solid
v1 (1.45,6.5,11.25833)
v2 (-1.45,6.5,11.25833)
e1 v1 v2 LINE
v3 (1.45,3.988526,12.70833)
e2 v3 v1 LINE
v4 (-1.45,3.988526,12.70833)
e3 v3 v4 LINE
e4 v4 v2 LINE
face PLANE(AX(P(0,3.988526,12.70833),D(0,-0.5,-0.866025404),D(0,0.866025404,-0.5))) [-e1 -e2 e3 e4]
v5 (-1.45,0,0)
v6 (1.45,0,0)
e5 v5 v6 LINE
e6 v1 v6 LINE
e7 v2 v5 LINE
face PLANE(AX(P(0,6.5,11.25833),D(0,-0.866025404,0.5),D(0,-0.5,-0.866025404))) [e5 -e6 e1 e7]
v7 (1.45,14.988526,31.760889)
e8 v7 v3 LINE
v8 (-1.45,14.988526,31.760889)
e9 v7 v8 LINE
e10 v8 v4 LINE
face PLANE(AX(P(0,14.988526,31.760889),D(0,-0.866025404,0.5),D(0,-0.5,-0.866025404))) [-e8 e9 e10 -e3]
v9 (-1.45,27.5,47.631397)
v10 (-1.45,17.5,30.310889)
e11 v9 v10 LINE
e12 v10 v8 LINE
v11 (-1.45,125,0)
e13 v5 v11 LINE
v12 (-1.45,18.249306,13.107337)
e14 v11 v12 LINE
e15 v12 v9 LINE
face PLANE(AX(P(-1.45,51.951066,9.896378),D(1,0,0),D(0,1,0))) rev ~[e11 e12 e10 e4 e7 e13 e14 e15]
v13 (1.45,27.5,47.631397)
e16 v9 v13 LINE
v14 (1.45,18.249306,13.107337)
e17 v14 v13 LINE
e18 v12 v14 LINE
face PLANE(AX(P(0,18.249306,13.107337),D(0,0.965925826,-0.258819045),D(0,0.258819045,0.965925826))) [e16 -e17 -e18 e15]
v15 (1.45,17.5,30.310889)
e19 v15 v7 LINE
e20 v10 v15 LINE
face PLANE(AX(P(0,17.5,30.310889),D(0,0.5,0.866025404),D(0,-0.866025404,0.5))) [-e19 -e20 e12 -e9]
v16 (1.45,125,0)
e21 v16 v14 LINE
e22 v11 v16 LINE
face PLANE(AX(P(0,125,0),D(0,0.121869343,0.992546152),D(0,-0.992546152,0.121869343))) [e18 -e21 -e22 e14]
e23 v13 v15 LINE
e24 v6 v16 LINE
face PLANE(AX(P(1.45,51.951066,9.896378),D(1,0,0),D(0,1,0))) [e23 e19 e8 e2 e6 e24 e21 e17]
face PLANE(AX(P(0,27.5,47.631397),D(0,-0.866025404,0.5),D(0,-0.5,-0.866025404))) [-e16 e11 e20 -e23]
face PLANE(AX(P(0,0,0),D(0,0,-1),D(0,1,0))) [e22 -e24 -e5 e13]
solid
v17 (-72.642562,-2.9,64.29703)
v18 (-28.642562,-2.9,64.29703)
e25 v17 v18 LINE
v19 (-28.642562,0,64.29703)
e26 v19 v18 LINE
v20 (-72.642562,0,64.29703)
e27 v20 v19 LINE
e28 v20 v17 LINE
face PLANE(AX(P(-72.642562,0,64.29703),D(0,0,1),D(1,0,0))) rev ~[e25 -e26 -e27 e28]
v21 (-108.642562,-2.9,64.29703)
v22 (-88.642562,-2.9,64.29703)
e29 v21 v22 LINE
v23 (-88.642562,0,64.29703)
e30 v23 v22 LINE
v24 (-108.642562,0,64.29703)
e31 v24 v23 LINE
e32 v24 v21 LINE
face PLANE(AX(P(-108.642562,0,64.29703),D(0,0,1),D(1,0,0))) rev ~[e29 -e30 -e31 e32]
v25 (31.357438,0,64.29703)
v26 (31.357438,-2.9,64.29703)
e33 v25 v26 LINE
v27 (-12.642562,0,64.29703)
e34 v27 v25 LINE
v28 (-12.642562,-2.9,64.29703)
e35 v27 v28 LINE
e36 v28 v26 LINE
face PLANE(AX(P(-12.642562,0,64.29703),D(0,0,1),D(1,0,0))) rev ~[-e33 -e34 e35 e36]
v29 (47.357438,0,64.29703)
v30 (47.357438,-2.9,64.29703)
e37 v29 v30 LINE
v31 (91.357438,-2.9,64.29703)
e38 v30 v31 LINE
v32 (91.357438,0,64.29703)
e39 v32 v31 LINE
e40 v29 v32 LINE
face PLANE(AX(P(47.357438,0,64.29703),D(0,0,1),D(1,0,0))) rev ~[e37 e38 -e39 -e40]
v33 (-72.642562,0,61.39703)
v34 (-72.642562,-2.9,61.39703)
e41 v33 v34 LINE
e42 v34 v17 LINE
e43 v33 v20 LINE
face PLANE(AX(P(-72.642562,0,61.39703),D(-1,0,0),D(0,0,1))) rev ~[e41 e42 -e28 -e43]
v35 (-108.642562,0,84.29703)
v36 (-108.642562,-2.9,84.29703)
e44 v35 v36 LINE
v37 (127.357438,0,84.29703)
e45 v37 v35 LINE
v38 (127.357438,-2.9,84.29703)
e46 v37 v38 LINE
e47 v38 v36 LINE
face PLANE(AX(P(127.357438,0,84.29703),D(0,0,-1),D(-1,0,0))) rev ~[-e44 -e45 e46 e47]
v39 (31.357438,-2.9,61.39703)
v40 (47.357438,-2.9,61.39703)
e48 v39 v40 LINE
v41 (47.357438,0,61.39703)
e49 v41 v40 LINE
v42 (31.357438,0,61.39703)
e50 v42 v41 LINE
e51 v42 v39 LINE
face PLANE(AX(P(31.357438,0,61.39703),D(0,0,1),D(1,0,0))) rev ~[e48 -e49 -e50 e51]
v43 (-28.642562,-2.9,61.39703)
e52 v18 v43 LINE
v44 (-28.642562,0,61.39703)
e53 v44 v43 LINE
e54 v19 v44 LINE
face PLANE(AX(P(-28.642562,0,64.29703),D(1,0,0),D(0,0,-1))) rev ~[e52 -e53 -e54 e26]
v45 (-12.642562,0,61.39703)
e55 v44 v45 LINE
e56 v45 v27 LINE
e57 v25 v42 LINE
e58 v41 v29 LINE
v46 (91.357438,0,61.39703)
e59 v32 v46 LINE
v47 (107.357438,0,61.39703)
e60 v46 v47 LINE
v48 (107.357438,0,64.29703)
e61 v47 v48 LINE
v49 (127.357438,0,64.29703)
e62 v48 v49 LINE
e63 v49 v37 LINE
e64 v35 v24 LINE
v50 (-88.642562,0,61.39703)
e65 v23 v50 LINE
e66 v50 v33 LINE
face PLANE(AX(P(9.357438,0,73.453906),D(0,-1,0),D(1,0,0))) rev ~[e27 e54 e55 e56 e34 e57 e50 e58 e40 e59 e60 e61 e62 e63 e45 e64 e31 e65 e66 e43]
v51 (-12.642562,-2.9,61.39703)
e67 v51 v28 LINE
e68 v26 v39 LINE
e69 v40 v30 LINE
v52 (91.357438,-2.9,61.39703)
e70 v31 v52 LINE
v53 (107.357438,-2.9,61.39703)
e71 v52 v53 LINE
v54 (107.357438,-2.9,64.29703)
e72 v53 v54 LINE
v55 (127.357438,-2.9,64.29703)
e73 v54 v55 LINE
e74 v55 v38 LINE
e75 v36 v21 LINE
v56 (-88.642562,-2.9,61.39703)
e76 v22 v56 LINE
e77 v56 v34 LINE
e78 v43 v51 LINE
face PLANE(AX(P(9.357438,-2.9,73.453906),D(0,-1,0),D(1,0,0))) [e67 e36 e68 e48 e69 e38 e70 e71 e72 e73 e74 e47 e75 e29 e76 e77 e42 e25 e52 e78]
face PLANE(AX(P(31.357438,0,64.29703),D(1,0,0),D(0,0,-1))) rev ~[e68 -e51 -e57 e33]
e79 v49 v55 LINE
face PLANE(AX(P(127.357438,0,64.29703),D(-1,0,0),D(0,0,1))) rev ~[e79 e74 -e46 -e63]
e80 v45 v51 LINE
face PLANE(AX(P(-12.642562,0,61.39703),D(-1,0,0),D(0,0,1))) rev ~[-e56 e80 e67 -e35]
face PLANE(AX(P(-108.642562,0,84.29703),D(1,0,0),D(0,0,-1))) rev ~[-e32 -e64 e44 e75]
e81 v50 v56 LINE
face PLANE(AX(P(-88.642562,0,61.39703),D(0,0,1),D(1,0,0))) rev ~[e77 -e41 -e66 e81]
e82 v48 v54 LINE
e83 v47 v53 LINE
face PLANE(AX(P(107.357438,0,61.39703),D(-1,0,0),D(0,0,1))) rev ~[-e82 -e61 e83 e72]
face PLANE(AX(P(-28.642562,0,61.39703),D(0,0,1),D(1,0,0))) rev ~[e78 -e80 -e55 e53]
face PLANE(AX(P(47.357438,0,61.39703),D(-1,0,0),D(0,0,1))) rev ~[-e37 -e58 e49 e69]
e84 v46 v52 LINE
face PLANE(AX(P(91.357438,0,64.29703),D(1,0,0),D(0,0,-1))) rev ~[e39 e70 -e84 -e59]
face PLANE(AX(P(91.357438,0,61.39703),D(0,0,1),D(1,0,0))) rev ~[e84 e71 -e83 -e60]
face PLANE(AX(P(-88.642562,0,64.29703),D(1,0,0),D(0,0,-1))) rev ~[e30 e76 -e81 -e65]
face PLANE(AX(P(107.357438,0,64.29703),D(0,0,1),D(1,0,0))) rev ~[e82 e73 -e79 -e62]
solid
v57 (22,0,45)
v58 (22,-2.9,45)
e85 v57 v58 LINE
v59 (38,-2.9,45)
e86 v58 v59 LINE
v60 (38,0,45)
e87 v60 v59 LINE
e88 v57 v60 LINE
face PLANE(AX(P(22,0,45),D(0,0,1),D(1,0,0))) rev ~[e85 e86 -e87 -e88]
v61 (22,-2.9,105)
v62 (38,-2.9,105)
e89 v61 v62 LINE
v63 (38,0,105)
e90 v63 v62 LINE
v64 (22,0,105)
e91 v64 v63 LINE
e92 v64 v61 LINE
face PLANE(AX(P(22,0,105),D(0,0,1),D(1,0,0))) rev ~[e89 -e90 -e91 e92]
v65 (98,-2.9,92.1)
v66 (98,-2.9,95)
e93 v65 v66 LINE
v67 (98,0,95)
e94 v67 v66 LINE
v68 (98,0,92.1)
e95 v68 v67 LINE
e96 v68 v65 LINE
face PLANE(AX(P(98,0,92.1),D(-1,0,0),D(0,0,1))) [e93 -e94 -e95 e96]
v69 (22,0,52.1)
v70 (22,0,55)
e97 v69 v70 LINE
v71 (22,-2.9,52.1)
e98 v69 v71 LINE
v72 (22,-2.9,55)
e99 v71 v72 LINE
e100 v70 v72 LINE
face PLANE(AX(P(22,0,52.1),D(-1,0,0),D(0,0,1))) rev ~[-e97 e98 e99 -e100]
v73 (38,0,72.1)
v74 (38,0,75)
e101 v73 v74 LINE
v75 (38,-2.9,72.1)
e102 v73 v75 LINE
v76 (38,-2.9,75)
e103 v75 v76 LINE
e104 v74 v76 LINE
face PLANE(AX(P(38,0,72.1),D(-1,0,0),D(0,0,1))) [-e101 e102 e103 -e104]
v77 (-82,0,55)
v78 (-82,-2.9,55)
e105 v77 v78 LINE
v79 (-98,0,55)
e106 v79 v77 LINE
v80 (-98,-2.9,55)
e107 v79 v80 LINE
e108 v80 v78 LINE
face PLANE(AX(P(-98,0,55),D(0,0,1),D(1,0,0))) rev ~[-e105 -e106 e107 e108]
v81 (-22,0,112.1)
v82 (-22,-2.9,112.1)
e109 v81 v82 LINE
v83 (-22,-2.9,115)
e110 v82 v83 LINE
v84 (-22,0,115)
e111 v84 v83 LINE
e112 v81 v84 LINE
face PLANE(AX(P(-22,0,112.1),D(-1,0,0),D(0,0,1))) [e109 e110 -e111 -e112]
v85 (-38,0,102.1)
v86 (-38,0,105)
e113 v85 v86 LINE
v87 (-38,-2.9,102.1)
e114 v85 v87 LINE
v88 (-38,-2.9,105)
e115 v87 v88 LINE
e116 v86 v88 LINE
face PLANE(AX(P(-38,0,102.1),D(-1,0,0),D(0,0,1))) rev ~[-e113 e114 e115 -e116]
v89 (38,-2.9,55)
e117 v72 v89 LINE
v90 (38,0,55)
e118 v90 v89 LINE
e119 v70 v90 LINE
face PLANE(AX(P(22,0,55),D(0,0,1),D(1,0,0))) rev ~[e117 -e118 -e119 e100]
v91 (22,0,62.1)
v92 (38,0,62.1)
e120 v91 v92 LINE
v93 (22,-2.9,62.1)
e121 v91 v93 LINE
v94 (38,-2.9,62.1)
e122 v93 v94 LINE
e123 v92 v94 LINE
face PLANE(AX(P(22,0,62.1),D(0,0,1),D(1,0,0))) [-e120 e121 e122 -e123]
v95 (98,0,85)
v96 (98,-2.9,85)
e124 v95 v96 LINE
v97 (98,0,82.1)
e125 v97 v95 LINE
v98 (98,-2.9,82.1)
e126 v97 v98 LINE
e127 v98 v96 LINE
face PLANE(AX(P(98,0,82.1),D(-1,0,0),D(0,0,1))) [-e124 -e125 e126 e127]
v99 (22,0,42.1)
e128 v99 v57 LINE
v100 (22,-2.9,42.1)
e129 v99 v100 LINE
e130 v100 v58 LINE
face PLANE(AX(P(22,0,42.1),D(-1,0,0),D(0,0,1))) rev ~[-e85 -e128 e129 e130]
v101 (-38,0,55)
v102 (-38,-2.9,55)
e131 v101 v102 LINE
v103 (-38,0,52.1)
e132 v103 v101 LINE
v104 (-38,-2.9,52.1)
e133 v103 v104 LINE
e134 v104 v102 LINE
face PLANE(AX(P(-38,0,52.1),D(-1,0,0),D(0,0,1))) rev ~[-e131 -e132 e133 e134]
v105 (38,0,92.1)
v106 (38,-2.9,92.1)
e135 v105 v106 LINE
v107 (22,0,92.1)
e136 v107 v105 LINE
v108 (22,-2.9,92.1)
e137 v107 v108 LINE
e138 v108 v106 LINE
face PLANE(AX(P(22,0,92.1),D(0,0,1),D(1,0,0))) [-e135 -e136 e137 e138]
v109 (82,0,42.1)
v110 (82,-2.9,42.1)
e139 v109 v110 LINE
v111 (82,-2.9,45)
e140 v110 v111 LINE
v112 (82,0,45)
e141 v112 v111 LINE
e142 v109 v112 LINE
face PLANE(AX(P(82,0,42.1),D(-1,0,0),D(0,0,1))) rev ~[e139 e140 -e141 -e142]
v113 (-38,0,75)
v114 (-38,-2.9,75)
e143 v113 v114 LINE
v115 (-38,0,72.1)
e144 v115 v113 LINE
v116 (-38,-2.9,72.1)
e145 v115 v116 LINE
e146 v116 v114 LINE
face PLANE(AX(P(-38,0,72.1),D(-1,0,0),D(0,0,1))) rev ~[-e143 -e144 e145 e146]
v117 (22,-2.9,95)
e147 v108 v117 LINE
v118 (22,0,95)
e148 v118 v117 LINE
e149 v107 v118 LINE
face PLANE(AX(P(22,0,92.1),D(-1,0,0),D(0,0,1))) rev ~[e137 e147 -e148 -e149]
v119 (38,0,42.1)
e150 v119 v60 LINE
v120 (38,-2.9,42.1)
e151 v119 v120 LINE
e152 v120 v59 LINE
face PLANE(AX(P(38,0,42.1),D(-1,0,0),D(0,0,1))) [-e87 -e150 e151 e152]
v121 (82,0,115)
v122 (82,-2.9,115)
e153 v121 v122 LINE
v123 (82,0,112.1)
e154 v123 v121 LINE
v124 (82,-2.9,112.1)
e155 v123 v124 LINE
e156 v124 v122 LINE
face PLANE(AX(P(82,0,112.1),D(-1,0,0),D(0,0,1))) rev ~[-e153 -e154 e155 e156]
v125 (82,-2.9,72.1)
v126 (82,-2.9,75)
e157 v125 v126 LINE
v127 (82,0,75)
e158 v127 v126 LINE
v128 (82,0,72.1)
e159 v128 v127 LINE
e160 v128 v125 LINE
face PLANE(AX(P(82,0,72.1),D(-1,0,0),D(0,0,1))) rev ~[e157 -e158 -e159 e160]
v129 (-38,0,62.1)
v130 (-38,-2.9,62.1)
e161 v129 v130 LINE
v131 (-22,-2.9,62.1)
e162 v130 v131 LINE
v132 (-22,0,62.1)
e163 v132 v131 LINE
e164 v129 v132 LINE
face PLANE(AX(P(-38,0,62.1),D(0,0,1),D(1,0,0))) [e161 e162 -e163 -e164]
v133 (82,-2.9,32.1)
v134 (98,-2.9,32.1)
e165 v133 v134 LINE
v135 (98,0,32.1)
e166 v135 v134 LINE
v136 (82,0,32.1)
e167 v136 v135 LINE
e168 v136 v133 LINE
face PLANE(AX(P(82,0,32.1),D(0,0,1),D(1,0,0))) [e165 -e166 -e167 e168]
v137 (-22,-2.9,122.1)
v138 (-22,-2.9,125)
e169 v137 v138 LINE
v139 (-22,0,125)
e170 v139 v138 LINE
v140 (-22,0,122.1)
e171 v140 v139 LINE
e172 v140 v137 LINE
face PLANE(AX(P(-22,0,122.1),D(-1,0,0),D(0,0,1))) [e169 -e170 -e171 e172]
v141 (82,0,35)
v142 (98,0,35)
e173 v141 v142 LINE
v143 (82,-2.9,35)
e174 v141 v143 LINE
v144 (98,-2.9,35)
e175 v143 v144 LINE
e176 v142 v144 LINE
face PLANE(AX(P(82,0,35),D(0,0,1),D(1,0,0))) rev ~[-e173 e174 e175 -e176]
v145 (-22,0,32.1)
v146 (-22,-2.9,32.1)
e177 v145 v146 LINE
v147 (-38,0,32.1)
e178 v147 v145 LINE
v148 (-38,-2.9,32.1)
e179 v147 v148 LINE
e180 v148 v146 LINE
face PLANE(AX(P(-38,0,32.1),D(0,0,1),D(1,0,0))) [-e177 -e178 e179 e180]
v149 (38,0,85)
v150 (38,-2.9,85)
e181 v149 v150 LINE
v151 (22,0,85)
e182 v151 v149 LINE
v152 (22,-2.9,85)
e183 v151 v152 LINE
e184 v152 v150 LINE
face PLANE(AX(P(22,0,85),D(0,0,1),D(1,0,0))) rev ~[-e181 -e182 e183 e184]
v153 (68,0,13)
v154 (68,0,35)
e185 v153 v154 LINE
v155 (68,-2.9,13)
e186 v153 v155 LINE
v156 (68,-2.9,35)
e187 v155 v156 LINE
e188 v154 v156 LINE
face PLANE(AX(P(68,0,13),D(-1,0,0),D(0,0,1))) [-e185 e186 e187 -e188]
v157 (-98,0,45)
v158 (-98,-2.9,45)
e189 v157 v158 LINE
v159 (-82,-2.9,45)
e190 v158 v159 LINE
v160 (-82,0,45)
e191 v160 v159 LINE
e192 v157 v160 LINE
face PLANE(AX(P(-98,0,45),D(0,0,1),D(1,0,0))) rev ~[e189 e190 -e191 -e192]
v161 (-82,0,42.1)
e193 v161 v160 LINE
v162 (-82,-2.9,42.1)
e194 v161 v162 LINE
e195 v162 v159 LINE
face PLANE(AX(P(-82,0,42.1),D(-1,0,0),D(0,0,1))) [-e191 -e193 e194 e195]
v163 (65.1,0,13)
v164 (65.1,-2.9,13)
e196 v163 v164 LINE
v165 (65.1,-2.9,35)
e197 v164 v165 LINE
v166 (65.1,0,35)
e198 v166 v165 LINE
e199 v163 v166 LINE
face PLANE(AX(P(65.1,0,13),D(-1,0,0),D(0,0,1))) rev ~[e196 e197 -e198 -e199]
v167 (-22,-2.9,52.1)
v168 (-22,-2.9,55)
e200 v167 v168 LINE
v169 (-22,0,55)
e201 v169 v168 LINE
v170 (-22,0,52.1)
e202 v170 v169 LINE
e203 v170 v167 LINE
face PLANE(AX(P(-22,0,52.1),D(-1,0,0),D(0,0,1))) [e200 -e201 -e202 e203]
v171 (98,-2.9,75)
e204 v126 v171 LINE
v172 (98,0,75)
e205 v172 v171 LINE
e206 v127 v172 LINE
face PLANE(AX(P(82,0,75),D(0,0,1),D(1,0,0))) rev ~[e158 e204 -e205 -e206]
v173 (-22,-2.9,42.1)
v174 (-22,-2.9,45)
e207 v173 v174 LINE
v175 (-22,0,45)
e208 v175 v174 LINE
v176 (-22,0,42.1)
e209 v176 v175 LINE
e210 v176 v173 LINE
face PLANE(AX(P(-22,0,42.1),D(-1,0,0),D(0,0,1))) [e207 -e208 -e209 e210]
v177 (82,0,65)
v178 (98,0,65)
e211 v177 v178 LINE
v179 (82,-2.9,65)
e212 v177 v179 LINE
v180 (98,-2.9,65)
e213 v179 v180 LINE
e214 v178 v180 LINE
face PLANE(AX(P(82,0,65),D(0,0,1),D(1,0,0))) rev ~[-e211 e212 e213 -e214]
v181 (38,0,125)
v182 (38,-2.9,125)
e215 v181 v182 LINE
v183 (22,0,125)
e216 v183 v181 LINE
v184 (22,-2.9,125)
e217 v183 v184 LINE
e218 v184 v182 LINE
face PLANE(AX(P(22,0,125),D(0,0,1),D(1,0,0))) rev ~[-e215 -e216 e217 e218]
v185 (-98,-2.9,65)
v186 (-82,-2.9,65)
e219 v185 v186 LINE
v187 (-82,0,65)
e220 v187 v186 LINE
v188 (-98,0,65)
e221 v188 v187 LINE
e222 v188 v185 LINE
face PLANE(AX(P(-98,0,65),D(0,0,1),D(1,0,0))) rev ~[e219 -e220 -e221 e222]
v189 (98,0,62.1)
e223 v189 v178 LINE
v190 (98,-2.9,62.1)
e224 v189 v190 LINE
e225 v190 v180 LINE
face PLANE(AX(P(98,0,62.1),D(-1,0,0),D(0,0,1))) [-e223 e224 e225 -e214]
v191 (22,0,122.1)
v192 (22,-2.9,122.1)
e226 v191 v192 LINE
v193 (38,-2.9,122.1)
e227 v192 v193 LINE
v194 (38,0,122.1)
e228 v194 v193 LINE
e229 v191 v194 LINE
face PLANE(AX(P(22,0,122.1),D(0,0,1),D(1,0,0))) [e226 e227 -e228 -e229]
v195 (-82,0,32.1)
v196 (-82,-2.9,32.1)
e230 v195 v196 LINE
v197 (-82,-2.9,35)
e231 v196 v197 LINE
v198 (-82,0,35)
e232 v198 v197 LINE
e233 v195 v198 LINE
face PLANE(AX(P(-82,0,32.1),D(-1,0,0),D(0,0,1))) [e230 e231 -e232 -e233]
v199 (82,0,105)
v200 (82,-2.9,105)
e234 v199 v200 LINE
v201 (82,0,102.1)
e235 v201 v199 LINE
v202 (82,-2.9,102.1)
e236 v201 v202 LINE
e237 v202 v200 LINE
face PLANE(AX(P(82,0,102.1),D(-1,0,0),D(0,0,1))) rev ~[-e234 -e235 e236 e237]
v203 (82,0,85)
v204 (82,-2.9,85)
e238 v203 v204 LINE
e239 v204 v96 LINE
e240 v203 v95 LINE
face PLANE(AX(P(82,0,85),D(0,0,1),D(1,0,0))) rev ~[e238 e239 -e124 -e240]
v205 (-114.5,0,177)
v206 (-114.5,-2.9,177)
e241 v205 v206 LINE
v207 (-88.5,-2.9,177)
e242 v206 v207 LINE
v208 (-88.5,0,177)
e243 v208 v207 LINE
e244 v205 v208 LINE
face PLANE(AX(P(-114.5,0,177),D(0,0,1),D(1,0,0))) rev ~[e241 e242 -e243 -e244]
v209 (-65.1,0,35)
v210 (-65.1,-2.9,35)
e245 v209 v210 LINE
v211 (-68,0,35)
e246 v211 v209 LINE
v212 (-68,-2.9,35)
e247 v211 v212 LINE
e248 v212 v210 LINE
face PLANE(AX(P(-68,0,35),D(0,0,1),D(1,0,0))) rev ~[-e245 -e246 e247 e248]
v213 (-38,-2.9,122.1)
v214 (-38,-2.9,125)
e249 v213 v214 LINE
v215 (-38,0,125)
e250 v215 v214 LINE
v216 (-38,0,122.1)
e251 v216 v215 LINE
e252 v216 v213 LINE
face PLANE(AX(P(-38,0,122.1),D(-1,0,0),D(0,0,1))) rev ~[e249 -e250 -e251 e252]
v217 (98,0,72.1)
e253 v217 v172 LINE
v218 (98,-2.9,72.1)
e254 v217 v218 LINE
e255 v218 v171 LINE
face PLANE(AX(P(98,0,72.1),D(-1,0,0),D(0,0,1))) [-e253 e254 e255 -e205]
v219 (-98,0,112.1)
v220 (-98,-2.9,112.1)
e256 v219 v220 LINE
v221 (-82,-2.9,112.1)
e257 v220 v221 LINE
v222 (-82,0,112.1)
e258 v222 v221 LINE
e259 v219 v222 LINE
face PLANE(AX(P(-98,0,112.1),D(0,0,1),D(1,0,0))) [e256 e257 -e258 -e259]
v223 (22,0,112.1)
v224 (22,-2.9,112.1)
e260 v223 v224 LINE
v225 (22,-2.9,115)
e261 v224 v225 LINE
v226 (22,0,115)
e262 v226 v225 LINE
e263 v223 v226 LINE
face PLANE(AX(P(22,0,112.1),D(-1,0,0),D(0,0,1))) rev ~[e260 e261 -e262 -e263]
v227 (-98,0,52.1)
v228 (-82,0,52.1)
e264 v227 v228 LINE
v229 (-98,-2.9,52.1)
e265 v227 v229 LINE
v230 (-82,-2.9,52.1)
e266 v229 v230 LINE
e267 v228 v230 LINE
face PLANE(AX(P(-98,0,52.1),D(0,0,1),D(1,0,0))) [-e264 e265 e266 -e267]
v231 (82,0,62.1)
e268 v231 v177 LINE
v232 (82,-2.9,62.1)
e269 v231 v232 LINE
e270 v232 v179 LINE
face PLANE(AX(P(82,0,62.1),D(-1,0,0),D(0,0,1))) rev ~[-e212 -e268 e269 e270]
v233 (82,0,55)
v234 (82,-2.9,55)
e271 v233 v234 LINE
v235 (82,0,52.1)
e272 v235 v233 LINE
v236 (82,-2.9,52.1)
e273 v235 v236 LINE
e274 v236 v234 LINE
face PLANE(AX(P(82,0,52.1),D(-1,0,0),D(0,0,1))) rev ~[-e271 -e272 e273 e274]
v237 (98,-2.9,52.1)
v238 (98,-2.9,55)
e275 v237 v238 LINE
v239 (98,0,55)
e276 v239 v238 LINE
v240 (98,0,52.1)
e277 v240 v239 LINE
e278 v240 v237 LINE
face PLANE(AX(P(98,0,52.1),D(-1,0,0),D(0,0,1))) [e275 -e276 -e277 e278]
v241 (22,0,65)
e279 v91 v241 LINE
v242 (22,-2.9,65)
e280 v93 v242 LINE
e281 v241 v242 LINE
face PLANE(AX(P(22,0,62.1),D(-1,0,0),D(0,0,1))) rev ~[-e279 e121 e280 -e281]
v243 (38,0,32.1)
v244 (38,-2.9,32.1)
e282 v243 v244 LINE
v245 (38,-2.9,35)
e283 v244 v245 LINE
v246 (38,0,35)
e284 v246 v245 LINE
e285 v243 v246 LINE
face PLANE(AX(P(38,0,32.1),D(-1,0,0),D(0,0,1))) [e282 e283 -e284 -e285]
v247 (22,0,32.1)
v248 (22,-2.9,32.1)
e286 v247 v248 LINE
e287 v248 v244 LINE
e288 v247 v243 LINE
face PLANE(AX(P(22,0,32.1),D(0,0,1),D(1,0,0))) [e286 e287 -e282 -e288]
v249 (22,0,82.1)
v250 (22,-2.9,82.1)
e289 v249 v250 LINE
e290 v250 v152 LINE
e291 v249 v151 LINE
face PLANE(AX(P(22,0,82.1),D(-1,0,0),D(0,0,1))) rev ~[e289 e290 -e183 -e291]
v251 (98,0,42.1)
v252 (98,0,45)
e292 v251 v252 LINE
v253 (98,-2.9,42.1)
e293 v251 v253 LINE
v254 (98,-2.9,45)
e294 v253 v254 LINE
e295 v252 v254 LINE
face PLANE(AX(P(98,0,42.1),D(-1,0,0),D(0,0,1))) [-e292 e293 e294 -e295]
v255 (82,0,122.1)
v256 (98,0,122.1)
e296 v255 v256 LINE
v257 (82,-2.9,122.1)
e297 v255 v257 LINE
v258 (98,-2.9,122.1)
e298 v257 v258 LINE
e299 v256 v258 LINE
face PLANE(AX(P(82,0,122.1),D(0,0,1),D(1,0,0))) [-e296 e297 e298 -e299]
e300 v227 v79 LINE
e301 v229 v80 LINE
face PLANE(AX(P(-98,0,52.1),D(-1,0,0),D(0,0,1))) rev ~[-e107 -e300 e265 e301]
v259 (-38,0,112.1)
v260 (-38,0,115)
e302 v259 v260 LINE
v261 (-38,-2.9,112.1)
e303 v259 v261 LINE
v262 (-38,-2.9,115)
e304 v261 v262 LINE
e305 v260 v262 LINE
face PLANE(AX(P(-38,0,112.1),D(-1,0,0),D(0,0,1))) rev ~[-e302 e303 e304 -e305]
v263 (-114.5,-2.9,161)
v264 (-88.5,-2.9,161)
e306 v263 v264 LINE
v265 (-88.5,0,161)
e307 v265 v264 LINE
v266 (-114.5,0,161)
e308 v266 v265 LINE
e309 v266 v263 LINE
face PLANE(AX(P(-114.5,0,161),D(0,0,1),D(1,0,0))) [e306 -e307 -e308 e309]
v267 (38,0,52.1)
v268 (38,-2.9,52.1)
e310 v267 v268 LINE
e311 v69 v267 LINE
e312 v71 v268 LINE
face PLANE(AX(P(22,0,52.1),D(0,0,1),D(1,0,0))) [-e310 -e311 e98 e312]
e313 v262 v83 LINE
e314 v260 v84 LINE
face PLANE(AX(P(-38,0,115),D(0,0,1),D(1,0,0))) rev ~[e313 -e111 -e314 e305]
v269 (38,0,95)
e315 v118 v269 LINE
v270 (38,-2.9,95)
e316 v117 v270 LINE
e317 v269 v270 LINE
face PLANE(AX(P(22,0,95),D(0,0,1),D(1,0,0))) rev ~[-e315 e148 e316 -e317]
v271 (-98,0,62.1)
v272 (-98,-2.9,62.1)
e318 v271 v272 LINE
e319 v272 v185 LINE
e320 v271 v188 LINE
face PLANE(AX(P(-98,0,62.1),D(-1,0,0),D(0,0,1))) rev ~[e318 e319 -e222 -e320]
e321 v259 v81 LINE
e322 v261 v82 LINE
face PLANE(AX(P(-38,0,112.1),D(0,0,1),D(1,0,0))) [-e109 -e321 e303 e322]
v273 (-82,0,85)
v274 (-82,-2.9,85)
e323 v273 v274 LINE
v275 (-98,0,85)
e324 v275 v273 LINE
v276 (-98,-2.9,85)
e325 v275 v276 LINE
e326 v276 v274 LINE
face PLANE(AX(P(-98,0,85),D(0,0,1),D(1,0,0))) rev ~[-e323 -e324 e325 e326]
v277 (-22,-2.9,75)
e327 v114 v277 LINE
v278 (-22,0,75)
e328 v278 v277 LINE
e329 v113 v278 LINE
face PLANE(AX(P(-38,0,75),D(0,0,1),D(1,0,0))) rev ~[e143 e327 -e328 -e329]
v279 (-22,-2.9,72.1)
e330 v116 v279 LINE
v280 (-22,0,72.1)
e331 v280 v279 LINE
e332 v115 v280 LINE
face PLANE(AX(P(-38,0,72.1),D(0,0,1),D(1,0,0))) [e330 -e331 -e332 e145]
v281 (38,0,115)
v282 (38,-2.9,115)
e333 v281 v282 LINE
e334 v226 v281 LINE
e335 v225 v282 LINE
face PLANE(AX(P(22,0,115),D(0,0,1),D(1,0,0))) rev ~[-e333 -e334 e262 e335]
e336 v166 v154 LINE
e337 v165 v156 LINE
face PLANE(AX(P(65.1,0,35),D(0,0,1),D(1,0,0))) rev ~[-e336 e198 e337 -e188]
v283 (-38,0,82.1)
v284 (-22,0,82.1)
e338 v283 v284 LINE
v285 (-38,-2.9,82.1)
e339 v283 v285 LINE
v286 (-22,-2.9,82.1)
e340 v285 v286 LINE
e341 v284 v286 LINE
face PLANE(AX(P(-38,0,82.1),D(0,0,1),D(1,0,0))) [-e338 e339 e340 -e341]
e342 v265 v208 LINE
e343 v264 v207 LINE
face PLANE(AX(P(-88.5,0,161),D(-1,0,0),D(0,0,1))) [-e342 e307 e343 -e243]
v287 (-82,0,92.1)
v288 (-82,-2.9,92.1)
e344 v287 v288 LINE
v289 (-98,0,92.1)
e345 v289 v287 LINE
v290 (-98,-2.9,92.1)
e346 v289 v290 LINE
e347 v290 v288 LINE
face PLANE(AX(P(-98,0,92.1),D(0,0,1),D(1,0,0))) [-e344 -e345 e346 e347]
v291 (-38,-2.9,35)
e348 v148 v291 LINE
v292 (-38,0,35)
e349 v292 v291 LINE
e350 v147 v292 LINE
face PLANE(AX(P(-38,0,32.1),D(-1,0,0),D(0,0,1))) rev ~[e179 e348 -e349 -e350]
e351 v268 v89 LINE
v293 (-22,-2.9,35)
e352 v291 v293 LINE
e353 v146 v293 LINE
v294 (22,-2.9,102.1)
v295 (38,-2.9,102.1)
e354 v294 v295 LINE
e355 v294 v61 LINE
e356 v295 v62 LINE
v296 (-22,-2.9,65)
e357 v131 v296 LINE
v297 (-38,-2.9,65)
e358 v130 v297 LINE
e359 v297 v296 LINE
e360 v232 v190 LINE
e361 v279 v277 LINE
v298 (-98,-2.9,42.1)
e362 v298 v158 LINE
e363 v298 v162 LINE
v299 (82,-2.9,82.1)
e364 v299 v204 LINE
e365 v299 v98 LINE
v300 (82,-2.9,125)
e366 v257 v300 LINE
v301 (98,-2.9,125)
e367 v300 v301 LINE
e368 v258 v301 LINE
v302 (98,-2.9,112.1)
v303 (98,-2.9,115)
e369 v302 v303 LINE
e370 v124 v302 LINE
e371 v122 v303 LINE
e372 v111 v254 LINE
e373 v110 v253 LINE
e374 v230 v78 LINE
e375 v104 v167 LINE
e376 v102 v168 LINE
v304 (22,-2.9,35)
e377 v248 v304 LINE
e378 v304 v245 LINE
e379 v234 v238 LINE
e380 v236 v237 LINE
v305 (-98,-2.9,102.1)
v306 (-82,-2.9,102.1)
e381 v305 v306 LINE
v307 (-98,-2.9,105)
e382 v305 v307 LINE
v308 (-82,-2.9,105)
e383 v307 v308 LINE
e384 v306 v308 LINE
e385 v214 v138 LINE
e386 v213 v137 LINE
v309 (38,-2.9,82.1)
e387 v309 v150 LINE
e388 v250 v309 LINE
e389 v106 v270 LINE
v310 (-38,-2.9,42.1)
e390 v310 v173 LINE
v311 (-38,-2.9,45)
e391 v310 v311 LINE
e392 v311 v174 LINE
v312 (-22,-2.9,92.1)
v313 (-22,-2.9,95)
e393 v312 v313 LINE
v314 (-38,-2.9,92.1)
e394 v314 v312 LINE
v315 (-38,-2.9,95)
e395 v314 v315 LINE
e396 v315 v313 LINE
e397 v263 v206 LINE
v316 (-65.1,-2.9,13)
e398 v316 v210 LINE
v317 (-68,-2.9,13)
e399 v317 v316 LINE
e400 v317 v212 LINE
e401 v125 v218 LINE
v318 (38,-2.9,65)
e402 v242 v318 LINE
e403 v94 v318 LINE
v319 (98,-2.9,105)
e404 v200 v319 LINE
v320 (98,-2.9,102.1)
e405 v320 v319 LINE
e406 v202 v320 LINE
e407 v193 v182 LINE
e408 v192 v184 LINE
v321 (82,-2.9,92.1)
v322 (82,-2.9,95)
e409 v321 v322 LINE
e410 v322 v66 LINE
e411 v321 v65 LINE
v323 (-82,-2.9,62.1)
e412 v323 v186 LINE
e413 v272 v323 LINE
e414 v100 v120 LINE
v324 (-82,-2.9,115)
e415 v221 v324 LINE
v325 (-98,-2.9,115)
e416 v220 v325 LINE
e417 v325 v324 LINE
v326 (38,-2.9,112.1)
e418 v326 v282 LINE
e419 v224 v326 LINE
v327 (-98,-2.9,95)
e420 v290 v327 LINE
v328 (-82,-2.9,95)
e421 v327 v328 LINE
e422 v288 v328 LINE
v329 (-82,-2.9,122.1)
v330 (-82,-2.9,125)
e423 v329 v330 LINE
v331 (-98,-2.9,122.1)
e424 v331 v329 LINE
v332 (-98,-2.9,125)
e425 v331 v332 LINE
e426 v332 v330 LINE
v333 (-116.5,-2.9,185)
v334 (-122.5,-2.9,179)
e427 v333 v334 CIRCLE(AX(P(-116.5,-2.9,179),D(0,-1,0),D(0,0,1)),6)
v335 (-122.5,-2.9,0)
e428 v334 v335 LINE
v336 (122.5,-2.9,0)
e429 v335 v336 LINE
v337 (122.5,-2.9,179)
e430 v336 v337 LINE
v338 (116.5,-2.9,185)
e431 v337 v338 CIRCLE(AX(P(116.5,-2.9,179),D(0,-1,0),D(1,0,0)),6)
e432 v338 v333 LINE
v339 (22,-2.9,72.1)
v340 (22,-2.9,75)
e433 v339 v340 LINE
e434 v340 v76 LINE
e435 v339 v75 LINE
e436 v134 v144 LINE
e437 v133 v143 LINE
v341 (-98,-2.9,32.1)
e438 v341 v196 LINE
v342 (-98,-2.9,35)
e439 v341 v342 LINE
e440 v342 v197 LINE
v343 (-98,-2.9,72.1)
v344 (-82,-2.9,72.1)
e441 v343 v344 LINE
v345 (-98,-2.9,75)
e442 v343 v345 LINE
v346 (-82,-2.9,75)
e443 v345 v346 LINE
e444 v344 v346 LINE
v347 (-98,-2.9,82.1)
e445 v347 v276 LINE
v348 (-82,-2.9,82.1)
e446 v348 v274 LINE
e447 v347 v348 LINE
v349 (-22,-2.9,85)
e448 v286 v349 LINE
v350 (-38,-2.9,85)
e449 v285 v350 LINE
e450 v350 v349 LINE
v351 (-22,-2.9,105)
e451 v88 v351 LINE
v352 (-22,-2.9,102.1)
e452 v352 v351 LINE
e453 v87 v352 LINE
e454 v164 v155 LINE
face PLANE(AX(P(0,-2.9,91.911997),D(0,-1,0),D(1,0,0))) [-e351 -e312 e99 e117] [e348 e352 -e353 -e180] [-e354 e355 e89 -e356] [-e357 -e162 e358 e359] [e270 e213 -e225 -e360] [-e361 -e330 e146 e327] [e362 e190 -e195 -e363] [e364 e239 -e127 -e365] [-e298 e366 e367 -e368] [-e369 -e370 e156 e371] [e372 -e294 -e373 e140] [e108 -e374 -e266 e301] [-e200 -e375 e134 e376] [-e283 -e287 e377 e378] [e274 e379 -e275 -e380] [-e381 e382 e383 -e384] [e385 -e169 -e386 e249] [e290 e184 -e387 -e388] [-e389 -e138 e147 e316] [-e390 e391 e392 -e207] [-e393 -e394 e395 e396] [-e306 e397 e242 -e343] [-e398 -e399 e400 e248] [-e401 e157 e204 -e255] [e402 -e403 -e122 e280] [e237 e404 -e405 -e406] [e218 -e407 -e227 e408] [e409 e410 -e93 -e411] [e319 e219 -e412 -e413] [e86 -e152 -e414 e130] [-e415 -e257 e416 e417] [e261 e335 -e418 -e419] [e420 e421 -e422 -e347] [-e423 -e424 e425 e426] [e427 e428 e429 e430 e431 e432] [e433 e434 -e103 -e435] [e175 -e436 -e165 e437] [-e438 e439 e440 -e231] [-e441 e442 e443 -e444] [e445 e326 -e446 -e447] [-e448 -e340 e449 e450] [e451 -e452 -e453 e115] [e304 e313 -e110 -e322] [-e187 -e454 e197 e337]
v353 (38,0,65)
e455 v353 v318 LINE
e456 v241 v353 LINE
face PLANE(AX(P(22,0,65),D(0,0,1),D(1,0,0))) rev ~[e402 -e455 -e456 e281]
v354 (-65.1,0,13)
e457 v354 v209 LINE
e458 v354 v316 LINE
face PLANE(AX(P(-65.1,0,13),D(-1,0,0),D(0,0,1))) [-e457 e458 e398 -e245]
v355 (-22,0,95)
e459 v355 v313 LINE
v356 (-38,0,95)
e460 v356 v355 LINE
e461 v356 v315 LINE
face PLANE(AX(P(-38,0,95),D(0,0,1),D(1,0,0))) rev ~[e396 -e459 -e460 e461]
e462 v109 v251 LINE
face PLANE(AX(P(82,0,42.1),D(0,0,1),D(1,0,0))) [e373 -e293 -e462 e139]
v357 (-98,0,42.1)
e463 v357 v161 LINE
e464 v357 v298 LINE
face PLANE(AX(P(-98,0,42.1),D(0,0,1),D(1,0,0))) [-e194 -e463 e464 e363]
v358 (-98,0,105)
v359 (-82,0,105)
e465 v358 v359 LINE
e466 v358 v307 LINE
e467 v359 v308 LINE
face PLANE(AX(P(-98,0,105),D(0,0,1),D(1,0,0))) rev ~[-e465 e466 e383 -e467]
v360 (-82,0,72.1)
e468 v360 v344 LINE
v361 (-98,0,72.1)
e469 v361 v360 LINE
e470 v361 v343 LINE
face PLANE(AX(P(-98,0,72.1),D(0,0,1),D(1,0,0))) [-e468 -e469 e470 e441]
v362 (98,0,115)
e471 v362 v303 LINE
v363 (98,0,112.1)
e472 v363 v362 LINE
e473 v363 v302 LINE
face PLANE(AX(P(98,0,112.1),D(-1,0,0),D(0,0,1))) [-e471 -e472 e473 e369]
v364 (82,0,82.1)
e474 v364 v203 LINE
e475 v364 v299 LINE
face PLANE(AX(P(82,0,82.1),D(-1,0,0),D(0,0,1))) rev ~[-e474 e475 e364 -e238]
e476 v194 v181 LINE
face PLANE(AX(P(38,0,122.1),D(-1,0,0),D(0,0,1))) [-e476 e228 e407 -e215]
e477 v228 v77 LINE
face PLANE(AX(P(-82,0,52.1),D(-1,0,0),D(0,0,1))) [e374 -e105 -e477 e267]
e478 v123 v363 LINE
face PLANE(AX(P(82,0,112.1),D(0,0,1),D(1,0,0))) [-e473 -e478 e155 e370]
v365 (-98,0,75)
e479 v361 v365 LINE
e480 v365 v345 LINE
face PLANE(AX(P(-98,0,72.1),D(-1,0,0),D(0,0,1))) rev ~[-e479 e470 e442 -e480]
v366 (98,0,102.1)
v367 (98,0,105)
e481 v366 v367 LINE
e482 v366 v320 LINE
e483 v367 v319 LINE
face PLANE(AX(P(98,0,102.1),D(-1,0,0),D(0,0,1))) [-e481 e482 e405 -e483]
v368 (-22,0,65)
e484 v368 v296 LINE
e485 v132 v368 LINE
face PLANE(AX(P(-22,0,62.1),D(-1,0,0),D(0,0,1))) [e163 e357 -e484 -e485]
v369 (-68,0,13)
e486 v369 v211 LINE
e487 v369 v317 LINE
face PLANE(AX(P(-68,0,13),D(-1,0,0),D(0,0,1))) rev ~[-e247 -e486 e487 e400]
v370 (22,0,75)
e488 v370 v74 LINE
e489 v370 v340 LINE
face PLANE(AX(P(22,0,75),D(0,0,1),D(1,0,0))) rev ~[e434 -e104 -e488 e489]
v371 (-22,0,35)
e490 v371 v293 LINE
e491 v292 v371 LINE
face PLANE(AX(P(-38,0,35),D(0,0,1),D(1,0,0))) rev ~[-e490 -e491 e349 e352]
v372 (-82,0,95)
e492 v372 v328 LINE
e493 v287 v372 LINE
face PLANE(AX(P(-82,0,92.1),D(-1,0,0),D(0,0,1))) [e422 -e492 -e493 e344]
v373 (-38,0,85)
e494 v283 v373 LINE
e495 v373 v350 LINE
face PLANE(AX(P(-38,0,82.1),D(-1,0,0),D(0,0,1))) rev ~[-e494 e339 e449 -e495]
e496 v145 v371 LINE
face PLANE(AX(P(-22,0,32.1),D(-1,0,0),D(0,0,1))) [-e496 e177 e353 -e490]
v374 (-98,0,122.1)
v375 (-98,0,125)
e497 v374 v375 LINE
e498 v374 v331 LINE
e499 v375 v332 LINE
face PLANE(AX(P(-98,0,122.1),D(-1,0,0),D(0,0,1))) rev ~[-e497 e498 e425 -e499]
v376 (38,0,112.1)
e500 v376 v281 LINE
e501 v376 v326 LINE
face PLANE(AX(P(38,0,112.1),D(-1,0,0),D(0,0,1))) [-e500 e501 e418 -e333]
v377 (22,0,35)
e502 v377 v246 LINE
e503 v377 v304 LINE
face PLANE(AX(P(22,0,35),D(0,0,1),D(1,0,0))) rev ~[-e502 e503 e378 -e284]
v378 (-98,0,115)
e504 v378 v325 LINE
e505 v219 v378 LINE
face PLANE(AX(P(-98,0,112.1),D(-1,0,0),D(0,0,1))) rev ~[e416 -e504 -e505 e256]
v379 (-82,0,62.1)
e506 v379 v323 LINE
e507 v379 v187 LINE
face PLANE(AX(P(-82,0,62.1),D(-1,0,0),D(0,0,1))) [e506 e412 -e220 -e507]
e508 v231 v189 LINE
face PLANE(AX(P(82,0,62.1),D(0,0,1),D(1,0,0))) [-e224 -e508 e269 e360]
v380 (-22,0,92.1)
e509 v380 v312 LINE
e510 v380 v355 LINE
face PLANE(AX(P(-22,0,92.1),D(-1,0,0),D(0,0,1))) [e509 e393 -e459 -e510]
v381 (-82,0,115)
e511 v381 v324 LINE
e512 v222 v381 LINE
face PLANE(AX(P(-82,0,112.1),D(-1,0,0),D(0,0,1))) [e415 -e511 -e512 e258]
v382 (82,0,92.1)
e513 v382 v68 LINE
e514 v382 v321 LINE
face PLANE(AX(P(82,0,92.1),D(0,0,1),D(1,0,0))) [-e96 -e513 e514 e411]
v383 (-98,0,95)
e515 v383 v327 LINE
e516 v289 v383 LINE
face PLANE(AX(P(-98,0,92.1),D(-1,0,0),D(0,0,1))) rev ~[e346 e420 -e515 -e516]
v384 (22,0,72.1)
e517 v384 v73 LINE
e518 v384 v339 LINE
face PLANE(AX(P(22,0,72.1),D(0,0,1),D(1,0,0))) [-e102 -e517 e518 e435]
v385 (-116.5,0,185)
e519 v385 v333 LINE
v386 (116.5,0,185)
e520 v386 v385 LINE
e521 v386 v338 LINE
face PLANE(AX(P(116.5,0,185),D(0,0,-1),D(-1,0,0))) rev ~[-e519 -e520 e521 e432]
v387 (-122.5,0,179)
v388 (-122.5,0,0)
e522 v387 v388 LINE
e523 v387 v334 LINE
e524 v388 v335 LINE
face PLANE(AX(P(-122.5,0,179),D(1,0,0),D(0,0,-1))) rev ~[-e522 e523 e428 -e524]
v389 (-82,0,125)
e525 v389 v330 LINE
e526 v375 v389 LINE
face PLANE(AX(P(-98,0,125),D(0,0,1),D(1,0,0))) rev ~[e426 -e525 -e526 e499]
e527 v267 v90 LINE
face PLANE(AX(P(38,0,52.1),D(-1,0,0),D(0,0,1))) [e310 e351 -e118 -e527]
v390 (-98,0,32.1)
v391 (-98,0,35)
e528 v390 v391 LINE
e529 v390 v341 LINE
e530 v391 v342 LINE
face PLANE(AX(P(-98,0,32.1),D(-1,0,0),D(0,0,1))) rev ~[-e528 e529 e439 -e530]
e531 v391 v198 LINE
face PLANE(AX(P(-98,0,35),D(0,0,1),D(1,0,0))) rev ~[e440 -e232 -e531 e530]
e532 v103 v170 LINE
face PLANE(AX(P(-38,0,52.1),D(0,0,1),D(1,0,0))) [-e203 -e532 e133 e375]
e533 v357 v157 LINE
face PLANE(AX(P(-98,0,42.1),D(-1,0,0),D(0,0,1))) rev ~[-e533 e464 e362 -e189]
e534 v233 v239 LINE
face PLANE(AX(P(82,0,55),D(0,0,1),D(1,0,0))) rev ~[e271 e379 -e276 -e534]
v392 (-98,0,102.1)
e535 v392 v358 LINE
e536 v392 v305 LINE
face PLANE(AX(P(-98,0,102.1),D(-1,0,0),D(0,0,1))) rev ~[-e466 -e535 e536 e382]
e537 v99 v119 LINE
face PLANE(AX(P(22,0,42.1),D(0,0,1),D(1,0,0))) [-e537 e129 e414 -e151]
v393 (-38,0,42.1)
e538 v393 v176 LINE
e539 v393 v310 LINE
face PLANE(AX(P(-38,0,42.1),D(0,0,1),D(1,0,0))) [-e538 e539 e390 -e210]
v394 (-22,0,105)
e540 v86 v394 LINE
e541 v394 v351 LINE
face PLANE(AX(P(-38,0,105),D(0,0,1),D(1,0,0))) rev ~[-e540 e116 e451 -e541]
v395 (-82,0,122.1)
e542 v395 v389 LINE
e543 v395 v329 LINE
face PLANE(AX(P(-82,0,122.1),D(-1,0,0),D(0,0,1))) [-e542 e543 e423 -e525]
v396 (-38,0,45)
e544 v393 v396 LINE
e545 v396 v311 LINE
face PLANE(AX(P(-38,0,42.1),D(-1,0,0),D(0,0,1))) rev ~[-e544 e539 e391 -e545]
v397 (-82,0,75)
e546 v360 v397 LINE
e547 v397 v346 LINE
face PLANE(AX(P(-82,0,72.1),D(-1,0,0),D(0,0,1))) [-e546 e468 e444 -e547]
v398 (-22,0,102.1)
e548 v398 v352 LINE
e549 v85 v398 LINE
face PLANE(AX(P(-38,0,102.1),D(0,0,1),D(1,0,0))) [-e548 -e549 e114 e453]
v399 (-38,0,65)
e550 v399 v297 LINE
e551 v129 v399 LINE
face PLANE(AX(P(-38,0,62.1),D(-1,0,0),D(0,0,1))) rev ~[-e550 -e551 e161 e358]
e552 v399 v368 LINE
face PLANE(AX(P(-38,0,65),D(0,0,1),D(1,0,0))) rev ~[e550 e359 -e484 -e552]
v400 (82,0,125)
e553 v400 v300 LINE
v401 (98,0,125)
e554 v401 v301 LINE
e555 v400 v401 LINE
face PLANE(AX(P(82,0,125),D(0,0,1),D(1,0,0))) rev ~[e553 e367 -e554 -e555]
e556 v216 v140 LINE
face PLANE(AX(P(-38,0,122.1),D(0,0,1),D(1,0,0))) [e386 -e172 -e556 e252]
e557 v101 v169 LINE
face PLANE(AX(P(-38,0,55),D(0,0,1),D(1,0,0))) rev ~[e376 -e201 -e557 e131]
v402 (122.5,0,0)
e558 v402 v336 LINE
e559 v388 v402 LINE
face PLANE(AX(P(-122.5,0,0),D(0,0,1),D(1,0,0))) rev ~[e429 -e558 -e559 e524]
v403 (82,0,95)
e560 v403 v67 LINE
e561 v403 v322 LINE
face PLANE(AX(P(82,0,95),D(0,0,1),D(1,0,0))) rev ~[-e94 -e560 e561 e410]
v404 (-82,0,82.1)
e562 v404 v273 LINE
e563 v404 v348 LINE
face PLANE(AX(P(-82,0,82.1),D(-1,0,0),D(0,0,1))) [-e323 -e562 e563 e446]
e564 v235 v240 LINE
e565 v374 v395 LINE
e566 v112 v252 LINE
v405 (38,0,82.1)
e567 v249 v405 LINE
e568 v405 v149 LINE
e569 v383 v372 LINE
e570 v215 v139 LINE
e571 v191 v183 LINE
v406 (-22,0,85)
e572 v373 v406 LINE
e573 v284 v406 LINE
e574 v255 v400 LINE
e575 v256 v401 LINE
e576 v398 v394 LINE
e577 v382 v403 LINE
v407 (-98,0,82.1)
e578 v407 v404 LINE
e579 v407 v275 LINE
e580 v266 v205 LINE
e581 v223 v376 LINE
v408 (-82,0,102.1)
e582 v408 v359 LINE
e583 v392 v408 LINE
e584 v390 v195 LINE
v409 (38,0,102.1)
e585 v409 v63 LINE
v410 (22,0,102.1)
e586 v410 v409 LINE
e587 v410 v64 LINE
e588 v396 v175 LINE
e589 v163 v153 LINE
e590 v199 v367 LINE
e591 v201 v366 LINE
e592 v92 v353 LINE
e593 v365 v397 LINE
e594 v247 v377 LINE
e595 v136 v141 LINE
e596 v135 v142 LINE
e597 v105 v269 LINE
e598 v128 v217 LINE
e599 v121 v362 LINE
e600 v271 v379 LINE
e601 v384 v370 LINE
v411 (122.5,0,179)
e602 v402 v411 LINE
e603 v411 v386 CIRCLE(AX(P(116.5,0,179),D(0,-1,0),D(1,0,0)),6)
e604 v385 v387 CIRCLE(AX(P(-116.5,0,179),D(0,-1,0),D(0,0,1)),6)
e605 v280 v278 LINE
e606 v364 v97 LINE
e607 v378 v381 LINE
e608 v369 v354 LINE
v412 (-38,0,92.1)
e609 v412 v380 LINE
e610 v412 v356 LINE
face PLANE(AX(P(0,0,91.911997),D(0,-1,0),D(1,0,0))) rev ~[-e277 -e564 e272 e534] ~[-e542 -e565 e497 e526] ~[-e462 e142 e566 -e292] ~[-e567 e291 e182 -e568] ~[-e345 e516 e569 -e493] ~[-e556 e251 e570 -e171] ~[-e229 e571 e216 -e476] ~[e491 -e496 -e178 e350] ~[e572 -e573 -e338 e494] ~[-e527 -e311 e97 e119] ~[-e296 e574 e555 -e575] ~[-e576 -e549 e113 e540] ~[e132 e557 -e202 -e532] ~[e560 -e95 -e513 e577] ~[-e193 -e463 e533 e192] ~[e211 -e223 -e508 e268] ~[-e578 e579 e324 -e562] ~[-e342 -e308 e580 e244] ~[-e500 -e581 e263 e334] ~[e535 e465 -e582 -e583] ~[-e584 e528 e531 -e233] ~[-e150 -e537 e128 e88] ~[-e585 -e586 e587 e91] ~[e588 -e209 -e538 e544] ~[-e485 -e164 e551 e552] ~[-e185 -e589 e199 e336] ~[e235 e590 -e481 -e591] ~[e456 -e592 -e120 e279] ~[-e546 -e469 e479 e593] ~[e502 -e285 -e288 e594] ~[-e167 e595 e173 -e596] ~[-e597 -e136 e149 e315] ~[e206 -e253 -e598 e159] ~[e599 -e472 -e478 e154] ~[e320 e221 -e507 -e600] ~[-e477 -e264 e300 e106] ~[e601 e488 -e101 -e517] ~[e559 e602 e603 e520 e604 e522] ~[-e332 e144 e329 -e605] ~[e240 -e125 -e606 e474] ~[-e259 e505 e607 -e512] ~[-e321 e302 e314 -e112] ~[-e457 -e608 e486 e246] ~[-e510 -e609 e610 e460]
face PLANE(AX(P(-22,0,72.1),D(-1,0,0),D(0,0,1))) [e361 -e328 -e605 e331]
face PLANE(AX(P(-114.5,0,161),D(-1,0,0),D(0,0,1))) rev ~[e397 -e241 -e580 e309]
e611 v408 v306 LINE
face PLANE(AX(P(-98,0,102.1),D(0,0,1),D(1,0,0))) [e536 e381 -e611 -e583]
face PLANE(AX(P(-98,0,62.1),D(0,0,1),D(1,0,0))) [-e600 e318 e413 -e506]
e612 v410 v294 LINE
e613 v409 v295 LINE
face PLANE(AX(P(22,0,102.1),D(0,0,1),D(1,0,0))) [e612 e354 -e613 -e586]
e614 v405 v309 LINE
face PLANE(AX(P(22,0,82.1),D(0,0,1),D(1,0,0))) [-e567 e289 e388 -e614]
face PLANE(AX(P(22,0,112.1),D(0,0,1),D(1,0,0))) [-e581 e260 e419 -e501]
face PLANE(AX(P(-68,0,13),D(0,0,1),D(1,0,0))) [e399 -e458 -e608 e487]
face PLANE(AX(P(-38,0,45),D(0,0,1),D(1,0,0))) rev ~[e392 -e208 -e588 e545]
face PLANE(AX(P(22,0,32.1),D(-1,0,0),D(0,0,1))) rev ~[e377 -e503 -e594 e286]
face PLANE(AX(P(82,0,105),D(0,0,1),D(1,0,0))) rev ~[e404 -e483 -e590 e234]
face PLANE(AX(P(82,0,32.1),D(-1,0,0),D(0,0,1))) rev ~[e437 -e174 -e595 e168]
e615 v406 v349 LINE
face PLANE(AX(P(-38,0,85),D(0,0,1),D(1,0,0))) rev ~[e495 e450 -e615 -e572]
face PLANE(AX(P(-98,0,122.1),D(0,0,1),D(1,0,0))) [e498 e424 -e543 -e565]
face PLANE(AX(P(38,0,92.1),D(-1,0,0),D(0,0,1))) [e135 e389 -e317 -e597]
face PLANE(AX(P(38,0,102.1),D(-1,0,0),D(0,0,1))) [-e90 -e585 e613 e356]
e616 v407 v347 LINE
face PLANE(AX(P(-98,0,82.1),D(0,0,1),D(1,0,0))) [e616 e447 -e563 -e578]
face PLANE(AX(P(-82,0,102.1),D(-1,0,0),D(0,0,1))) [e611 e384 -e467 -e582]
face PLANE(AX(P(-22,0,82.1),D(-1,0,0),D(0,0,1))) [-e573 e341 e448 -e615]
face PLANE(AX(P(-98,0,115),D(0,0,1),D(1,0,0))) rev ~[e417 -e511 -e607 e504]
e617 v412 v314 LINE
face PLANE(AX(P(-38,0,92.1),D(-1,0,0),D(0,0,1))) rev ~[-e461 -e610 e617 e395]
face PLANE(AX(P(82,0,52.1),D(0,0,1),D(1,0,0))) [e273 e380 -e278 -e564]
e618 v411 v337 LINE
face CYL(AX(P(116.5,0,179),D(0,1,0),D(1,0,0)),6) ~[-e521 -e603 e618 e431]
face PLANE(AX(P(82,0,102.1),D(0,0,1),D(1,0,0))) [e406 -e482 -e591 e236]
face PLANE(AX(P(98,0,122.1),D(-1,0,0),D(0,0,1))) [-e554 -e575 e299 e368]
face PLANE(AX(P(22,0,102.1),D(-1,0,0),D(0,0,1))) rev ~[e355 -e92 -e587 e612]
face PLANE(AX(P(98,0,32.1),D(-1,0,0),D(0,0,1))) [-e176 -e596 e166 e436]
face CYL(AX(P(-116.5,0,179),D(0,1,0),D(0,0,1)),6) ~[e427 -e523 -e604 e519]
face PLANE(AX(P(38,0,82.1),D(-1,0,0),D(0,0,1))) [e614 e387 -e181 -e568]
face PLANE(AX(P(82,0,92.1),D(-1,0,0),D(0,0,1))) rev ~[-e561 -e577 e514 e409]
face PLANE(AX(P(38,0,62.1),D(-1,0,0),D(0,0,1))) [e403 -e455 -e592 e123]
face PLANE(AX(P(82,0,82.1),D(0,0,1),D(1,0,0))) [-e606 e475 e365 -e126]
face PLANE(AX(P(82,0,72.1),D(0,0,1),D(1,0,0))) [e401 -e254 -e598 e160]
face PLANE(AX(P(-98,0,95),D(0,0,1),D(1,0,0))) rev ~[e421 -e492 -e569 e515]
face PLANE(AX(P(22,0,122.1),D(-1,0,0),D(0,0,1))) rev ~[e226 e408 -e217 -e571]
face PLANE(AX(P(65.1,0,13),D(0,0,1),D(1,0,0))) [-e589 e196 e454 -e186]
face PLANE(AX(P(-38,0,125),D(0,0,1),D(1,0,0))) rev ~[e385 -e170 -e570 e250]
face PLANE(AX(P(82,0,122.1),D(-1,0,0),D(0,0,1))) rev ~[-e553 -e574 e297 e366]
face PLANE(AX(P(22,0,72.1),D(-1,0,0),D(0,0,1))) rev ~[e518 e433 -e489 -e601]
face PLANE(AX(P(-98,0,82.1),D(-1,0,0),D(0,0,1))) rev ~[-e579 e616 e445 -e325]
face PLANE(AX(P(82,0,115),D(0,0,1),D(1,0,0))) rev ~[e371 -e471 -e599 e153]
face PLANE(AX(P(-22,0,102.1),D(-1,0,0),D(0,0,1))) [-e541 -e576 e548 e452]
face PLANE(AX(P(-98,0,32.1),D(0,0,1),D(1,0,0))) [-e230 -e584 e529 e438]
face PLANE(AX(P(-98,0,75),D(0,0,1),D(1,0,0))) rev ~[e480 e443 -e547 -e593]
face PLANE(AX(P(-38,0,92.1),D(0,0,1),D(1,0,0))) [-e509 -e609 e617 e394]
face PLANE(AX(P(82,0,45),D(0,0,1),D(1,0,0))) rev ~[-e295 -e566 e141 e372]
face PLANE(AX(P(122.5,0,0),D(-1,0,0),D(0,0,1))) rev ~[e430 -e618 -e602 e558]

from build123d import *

# Parameters (mm, degrees)
F0_W     = 16
F0_H     = 2.9
F0_W_2   = 2.9
F0_H_2   = 22
F0_W_3   = 26
F0_H_3   = 16
F1_DEPTH = 2.9
F3_DEPTH = 1.45
F5_DEPTH = 2.9


# Not quite as in the source:
# - a feature names something its author has since deleted; it is built from what else it names


with BuildPart() as f1:
    # F0 (on Front) → F1 (new body)
    with BuildSketch(Plane.XZ):
        with BuildLine():
            Line((116.5, 185), (-116.5, 185))
            ThreePointArc((-116.5, 185), (-120.7426406871, 183.2426406871), (-122.5, 179))
            Line((-122.5, 179), (-122.5, 0))
            Line((-122.5, 0), (122.5, 0))
            Line((122.5, 0), (122.5, 179))
            ThreePointArc((122.5, 179), (120.7426406871, 183.2426406871), (116.5, 185))
        make_face()
        with Locations((-90, 33.55)):
            Rectangle(F0_W, F0_H, mode=Mode.SUBTRACT)
        with Locations((-66.55, 24)):
            Rectangle(F0_W_2, F0_H_2, mode=Mode.SUBTRACT)
        with Locations((-90, 43.55)):
            Rectangle(F0_W, F0_H, mode=Mode.SUBTRACT)
        with Locations((-30, 33.55)):
            Rectangle(F0_W, F0_H, mode=Mode.SUBTRACT)
        with Locations((-30, 43.55)):
            Rectangle(F0_W, F0_H, mode=Mode.SUBTRACT)
        with Locations((-90, 53.55)):
            Rectangle(F0_W, F0_H, mode=Mode.SUBTRACT)
        with Locations((-90, 63.55)):
            Rectangle(F0_W, F0_H, mode=Mode.SUBTRACT)
        with Locations((-90, 73.55)):
            Rectangle(F0_W, F0_H, mode=Mode.SUBTRACT)
        with Locations((-90, 83.55)):
            Rectangle(F0_W, F0_H, mode=Mode.SUBTRACT)
        with Locations((-30, 53.55)):
            Rectangle(F0_W, F0_H, mode=Mode.SUBTRACT)
        with Locations((-30, 63.55)):
            Rectangle(F0_W, F0_H, mode=Mode.SUBTRACT)
        with Locations((-30, 73.55)):
            Rectangle(F0_W, F0_H, mode=Mode.SUBTRACT)
        with Locations((-30, 83.55)):
            Rectangle(F0_W, F0_H, mode=Mode.SUBTRACT)
        with Locations((30, 33.55)):
            Rectangle(F0_W, F0_H, mode=Mode.SUBTRACT)
        with Locations((30, 43.55)):
            Rectangle(F0_W, F0_H, mode=Mode.SUBTRACT)
        with Locations((66.55, 24)):
            Rectangle(F0_W_2, F0_H_2, mode=Mode.SUBTRACT)
        with Locations((90, 33.55)):
            Rectangle(F0_W, F0_H, mode=Mode.SUBTRACT)
        with Locations((90, 43.55)):
            Rectangle(F0_W, F0_H, mode=Mode.SUBTRACT)
        with Locations((30, 53.55)):
            Rectangle(F0_W, F0_H, mode=Mode.SUBTRACT)
        with Locations((30, 63.55)):
            Rectangle(F0_W, F0_H, mode=Mode.SUBTRACT)
        with Locations((30, 73.55)):
            Rectangle(F0_W, F0_H, mode=Mode.SUBTRACT)
        with Locations((30, 83.55)):
            Rectangle(F0_W, F0_H, mode=Mode.SUBTRACT)
        with Locations((90, 53.55)):
            Rectangle(F0_W, F0_H, mode=Mode.SUBTRACT)
        with Locations((90, 63.55)):
            Rectangle(F0_W, F0_H, mode=Mode.SUBTRACT)
        with Locations((90, 73.55)):
            Rectangle(F0_W, F0_H, mode=Mode.SUBTRACT)
        with Locations((90, 83.55)):
            Rectangle(F0_W, F0_H, mode=Mode.SUBTRACT)
        with Locations((-90, 93.55)):
            Rectangle(F0_W, F0_H, mode=Mode.SUBTRACT)
        with Locations((-90, 103.55)):
            Rectangle(F0_W, F0_H, mode=Mode.SUBTRACT)
        with Locations((-90, 113.55)):
            Rectangle(F0_W, F0_H, mode=Mode.SUBTRACT)
        with Locations((-90, 123.55)):
            Rectangle(F0_W, F0_H, mode=Mode.SUBTRACT)
        with Locations((-30, 93.55)):
            Rectangle(F0_W, F0_H, mode=Mode.SUBTRACT)
        with Locations((-30, 103.55)):
            Rectangle(F0_W, F0_H, mode=Mode.SUBTRACT)
        with Locations((-30, 113.55)):
            Rectangle(F0_W, F0_H, mode=Mode.SUBTRACT)
        with Locations((-30, 123.55)):
            Rectangle(F0_W, F0_H, mode=Mode.SUBTRACT)
        with Locations((-101.5, 169)):
            Rectangle(F0_W_3, F0_H_3, mode=Mode.SUBTRACT)
        with Locations((30, 93.55)):
            Rectangle(F0_W, F0_H, mode=Mode.SUBTRACT)
        with Locations((30, 103.55)):
            Rectangle(F0_W, F0_H, mode=Mode.SUBTRACT)
        with Locations((30, 113.55)):
            Rectangle(F0_W, F0_H, mode=Mode.SUBTRACT)
        with Locations((30, 123.55)):
            Rectangle(F0_W, F0_H, mode=Mode.SUBTRACT)
        with Locations((90, 93.55)):
            Rectangle(F0_W, F0_H, mode=Mode.SUBTRACT)
        with Locations((90, 103.55)):
            Rectangle(F0_W, F0_H, mode=Mode.SUBTRACT)
        with Locations((90, 113.55)):
            Rectangle(F0_W, F0_H, mode=Mode.SUBTRACT)
        with Locations((90, 123.55)):
            Rectangle(F0_W, F0_H, mode=Mode.SUBTRACT)
    extrude(amount=F1_DEPTH)


with BuildPart() as f3:
    # F2 (on Right) → F3 (new body, symmetric)
    with BuildSketch(Plane.YZ):
        Polygon((6.5, 11.2583302492), (0, 0), (125, 0), (18.2493059725, 13.1073370922), (27.5, 47.6313972081), (17.5, 30.3108891325), (14.988526329, 31.7608891325), (3.988526329, 12.7083302492), align=None)
    extrude(amount=F3_DEPTH, both=True)


with BuildPart() as f5:
    # F4 (on Front) → F5 (new body)
    with BuildSketch(Plane.XZ):
        Polygon((-108.6425621135, 84.2970302286), (-108.6425621135, 64.2970302286), (-88.6425621135, 64.2970302286), (-88.6425621135, 61.3970302286), (-72.6425621135, 61.3970302286), (-72.6425621135, 64.2970302286), (-28.6425621135, 64.2970302286), (-28.6425621135, 61.3970302286), (-12.6425621135, 61.3970302286), (-12.6425621135, 64.2970302286), (31.3574378865, 64.2970302286), (31.3574378865, 61.3970302286), (47.3574378865, 61.3970302286), (47.3574378865, 64.2970302286), (91.3574378865, 64.2970302286), (91.3574378865, 61.3970302286), (107.3574378865, 61.3970302286), (107.3574378865, 64.2970302286), (127.3574378865, 64.2970302286), (127.3574378865, 84.2970302286), align=None)
    extrude(amount=F5_DEPTH)


solid = Compound([f1.part, f3.part, f5.part])
